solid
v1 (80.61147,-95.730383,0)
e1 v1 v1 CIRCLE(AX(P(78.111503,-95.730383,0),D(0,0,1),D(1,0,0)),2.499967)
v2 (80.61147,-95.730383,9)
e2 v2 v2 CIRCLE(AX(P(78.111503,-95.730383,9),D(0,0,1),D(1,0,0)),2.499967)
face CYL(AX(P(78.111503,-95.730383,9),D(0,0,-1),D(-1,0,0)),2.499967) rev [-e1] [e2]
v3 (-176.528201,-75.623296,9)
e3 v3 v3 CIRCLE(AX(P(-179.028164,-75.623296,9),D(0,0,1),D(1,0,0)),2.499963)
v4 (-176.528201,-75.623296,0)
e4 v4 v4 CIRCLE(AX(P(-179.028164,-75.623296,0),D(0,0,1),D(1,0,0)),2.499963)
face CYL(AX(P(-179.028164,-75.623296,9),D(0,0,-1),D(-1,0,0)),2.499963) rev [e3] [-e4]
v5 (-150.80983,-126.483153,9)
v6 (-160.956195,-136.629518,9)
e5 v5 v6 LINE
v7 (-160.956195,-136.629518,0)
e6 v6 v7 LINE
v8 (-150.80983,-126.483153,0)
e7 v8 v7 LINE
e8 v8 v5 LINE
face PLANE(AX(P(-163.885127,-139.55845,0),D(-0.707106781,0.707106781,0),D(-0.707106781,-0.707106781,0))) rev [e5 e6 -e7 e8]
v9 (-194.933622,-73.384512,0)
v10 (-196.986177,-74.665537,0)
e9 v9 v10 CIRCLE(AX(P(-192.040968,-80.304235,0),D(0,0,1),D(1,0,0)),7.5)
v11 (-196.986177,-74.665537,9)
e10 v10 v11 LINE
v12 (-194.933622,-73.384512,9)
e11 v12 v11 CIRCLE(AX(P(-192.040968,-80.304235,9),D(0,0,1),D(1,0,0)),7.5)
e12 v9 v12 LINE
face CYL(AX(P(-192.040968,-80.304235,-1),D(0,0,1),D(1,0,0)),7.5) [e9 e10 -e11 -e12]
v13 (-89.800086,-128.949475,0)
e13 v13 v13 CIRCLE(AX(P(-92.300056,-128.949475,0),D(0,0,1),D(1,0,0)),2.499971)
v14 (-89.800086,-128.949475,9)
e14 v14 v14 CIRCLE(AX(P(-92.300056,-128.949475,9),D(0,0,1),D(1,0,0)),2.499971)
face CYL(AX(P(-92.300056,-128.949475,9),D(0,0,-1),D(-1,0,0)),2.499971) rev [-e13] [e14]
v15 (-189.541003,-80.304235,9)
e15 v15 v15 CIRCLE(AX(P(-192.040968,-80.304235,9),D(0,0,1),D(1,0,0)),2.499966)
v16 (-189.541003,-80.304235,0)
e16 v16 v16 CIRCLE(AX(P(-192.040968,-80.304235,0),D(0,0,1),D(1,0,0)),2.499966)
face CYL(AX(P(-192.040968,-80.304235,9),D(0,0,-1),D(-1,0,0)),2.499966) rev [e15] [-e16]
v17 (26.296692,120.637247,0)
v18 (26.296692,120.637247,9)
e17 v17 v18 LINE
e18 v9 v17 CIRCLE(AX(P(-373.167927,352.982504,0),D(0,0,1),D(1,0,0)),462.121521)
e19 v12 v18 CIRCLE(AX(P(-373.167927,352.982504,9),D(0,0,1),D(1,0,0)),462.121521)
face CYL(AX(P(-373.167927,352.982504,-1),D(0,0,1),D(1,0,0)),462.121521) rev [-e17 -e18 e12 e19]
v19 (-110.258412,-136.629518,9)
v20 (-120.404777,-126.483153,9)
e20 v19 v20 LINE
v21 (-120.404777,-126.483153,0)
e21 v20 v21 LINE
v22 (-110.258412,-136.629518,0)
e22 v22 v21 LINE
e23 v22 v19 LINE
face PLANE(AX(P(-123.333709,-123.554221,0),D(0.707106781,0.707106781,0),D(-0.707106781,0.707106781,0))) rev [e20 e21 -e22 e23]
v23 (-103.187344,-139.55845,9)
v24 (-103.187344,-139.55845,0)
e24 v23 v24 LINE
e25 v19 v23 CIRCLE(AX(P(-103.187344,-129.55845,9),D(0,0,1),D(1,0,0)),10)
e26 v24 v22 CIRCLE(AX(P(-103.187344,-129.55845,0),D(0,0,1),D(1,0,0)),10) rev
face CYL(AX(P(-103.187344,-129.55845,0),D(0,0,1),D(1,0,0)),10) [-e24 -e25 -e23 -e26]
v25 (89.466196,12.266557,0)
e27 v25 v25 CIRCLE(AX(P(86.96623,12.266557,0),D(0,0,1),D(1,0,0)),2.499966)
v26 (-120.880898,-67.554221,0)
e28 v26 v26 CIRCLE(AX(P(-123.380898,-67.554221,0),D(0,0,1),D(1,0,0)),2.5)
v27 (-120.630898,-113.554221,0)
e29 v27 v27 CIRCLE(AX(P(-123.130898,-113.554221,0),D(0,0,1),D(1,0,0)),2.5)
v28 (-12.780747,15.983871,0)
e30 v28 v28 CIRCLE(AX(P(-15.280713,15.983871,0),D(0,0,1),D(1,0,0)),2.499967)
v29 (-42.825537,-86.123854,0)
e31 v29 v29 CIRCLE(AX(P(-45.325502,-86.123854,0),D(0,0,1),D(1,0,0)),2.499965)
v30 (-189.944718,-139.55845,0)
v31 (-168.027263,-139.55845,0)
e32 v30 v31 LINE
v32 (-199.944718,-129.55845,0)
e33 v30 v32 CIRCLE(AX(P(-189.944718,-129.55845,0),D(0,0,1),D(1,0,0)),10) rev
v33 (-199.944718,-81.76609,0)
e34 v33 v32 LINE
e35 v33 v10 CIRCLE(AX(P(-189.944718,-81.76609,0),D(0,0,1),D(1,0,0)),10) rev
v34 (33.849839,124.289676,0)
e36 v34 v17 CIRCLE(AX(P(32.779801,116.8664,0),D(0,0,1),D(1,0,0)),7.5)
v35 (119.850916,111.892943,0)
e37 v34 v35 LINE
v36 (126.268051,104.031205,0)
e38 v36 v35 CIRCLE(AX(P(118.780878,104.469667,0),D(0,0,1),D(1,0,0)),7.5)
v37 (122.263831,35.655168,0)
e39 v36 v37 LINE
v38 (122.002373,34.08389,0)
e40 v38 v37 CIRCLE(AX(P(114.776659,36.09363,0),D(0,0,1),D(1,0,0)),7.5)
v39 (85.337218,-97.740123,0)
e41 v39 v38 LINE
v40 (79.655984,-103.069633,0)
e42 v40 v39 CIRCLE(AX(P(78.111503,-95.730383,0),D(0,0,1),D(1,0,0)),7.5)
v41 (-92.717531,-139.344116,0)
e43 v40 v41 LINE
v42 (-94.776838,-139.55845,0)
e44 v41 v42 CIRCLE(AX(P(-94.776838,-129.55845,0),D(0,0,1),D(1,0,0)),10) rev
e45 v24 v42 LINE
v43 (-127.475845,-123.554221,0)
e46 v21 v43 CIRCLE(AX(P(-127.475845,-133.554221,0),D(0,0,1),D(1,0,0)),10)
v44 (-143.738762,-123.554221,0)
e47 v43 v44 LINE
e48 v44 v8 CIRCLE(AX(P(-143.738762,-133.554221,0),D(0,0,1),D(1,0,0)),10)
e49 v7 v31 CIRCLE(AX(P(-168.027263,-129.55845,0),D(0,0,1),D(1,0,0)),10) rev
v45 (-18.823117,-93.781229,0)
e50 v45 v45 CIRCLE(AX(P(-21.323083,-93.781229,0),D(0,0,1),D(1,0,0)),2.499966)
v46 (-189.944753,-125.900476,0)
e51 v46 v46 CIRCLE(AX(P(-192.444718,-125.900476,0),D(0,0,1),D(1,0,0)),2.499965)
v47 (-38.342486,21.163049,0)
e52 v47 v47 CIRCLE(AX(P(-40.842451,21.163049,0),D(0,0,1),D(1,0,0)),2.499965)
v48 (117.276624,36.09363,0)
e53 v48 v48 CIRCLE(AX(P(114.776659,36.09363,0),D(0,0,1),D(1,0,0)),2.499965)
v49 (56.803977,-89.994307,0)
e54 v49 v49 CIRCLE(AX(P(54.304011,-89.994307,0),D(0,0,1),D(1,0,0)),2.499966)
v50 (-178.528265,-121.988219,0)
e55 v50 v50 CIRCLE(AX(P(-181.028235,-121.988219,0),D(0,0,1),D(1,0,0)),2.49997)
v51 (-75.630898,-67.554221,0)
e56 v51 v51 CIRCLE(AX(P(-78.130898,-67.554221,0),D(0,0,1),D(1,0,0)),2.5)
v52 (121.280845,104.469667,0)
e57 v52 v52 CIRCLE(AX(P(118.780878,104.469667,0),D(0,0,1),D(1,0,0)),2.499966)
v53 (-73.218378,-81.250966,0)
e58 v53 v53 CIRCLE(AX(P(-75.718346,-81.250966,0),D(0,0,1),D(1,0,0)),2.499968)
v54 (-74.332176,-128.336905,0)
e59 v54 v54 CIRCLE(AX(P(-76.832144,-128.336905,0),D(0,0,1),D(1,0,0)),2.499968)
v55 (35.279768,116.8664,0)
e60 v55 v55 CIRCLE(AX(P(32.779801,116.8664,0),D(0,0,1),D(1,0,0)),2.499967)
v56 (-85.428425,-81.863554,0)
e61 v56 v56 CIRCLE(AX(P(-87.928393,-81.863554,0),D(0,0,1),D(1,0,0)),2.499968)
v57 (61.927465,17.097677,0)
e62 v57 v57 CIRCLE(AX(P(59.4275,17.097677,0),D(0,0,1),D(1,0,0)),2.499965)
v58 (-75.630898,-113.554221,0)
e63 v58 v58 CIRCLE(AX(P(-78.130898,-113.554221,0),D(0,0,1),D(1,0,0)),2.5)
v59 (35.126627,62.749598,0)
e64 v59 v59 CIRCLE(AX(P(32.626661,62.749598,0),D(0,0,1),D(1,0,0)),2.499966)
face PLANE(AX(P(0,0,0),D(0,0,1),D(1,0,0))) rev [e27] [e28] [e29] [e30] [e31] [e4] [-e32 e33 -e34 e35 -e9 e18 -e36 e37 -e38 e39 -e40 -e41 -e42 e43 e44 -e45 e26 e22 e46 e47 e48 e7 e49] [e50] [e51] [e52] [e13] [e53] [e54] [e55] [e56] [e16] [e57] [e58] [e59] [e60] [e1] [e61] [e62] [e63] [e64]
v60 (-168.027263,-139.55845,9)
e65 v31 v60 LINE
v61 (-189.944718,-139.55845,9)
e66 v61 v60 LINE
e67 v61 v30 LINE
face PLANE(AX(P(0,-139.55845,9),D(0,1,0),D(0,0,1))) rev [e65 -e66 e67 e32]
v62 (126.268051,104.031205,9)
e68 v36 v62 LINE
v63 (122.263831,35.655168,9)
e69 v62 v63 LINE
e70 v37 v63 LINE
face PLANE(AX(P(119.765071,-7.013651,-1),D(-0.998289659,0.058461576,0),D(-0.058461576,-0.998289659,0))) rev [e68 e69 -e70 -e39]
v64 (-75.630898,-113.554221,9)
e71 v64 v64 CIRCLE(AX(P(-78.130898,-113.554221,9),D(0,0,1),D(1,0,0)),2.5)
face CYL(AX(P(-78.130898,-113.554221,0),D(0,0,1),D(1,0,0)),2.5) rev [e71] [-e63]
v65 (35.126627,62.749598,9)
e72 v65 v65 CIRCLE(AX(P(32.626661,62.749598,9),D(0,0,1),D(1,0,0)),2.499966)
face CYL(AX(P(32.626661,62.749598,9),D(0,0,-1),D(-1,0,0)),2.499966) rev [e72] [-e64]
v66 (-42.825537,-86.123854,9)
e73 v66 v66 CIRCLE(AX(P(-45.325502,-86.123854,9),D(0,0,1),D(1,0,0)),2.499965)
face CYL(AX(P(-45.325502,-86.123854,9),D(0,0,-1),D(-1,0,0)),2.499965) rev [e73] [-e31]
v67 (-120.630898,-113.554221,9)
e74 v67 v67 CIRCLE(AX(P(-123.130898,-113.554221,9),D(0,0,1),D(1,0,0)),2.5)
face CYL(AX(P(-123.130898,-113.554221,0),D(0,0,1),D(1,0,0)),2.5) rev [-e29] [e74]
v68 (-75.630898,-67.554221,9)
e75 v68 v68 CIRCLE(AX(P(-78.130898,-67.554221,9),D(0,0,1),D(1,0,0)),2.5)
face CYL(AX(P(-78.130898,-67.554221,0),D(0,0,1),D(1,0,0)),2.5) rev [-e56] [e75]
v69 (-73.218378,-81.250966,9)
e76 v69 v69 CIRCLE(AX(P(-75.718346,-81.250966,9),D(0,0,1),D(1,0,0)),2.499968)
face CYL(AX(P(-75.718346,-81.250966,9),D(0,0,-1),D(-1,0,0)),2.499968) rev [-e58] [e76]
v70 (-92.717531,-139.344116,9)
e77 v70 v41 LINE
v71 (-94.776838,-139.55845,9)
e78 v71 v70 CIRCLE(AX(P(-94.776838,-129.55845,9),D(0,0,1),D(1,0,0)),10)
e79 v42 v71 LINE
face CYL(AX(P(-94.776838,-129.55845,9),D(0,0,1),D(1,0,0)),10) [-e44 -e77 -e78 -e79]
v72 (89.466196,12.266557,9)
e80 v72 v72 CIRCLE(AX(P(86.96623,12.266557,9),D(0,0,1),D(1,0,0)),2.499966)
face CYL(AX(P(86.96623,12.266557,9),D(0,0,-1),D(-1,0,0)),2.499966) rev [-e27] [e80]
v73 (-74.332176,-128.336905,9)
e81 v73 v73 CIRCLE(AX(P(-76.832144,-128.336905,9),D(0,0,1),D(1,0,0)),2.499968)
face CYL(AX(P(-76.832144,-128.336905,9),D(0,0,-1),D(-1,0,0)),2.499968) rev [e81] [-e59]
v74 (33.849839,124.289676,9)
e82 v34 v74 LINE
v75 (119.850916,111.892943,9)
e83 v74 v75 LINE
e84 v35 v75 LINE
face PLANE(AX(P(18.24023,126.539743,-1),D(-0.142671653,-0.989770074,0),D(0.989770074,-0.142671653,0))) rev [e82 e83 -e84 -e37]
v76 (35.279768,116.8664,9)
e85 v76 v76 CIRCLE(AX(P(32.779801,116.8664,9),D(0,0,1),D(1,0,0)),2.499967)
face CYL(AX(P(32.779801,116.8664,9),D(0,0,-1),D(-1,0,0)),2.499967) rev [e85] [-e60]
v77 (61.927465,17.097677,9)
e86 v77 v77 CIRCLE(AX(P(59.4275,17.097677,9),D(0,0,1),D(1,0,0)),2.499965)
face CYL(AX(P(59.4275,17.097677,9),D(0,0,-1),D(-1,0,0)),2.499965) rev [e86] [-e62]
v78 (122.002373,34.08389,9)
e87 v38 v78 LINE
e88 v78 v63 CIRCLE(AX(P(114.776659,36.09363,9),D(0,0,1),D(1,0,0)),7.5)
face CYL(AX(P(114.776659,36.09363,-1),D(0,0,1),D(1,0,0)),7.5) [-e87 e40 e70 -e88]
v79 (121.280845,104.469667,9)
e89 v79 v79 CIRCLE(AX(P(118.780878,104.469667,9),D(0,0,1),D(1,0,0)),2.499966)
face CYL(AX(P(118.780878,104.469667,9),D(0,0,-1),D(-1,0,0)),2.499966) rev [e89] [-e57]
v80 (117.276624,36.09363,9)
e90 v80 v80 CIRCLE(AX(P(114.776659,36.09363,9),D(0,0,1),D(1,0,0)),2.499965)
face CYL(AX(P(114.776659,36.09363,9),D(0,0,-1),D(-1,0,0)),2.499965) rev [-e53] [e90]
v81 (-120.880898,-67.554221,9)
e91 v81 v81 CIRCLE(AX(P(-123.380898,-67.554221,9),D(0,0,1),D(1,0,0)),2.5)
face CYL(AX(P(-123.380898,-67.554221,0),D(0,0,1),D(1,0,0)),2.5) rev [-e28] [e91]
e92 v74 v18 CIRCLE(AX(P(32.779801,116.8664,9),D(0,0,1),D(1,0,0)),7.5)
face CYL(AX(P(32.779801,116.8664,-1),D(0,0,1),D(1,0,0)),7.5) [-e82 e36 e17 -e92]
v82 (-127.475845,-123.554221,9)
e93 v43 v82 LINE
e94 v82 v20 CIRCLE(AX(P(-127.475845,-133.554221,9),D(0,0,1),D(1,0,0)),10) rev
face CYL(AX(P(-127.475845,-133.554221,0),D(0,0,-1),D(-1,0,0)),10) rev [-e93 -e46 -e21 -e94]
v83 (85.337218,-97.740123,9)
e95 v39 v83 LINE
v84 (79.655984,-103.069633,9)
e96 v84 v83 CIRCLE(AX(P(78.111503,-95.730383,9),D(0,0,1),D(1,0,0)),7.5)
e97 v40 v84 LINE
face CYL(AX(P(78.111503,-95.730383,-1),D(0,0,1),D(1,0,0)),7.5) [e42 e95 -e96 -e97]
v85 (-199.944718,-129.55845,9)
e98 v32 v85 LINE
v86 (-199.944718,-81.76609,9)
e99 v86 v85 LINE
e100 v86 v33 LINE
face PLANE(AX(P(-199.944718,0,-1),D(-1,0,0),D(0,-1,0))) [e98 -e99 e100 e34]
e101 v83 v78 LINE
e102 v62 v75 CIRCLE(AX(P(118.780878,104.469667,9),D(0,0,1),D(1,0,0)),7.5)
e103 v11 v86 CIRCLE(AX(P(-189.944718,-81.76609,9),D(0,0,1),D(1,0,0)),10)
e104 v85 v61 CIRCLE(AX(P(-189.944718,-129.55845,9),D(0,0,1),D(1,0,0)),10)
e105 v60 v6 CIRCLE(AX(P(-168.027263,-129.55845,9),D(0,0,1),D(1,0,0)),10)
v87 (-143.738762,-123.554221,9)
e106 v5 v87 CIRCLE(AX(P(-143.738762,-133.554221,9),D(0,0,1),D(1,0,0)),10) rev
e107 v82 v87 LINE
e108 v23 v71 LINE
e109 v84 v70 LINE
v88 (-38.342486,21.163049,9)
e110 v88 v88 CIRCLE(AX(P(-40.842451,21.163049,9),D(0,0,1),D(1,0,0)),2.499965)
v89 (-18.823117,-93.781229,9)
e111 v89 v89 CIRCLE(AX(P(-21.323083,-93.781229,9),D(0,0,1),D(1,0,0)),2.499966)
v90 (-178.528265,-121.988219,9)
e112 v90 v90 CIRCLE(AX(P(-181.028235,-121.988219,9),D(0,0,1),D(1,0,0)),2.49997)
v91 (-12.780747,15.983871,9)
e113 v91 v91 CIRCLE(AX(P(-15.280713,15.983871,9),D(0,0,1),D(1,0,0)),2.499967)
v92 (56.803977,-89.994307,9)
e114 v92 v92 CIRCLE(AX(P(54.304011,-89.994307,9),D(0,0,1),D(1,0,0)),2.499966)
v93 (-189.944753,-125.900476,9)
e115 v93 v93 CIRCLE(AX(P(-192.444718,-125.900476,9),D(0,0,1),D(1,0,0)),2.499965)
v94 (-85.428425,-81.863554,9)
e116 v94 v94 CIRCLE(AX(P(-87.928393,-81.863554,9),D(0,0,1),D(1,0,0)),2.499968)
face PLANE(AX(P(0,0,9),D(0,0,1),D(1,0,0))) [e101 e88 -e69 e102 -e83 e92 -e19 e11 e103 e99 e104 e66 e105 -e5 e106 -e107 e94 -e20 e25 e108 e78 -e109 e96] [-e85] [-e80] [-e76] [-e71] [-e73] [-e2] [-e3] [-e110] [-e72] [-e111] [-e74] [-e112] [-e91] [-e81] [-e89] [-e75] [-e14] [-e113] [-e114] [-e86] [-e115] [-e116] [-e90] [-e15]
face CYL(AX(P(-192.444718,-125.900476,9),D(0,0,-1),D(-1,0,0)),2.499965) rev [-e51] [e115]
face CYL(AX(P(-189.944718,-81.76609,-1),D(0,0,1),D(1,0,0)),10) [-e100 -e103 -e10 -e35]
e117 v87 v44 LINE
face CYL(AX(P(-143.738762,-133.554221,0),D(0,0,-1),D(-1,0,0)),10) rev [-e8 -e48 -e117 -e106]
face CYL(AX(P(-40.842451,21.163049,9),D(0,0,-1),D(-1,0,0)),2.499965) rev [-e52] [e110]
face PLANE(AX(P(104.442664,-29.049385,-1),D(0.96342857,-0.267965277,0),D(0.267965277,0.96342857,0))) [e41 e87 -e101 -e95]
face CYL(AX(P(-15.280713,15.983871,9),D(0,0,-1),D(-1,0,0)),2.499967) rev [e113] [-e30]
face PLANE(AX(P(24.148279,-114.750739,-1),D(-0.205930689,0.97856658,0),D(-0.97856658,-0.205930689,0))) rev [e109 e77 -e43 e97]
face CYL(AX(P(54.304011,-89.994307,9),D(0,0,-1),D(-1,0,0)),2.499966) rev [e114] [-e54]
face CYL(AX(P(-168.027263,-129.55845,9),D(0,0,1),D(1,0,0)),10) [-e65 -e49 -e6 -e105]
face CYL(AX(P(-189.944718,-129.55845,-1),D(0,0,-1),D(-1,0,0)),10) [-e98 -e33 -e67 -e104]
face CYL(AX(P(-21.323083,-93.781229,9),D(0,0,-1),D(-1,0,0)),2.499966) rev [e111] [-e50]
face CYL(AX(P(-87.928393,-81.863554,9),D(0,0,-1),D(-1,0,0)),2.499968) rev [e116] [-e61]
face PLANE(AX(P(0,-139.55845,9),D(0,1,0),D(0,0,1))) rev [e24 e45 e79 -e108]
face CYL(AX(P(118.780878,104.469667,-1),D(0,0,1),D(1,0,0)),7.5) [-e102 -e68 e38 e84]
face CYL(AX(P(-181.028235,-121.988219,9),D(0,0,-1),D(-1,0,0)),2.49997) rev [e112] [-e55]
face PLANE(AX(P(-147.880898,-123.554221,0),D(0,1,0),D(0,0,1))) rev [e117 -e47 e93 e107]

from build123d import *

# Parameters (mm, degrees)
SKETCH2_R           = 2.499965
SKETCH2_R_2         = 2.49997
SKETCH2_R_3         = 2.4999655
SKETCH2_R_4         = 2.499962807
SKETCH2_R_5         = 2.4999705
SKETCH2_R_6         = 2.499967809
SKETCH2_R_7         = 2.499966
SKETCH2_R_8         = 2.4999665
SKETCH2_R_9         = 2.499966488
BOSS_EXTRUDE1_DEPTH = 9
CUT_EXTRUDE1_DEPTH  = 10
CUT_EXTRUDE2_DEPTH  = 244.998875453
SKETCH5_R           = 2.5
CUT_EXTRUDE3_DEPTH  = 244.998875453
CUT_EXTRUDE5_DEPTH  = 10
FILLET1_R           = 10


with BuildPart() as part:
    # Sketch2 → Boss-Extrude1 (new body)
    with BuildSketch(Plane.XY):
        Polygon((-211.70586, -139.55845), (122.983766, -139.55845), (211.70583, 139.558464), (-211.70586, 139.558464), align=None)
        with Locations((-192.444718, -125.900476)):
            Circle(SKETCH2_R, mode=Mode.SUBTRACT)
        with Locations((-181.028235, -121.988219)):
            Circle(SKETCH2_R_2, mode=Mode.SUBTRACT)
        with Locations((-192.0409685, -80.3042345)):
            Circle(SKETCH2_R_3, mode=Mode.SUBTRACT)
        with Locations((-179.0281635, -75.623296193)):
            Circle(SKETCH2_R_4, mode=Mode.SUBTRACT)
        with Locations((-92.3000565, -128.9494755)):
            Circle(SKETCH2_R_5, mode=Mode.SUBTRACT)
        with Locations((-76.832143809, -128.336904809)):
            Circle(SKETCH2_R_6, mode=Mode.SUBTRACT)
        with Locations((-87.928392809, -81.863553809)):
            Circle(SKETCH2_R_6, mode=Mode.SUBTRACT)
        with Locations((-75.718345809, -81.250965809)):
            Circle(SKETCH2_R_6, mode=Mode.SUBTRACT)
        with Locations((-45.325502, -86.123854)):
            Circle(SKETCH2_R, mode=Mode.SUBTRACT)
        with Locations((-21.323083, -93.781229)):
            Circle(SKETCH2_R_7, mode=Mode.SUBTRACT)
        with Locations((54.304011, -89.994307)):
            Circle(SKETCH2_R_7, mode=Mode.SUBTRACT)
        with Locations((78.1115035, -95.7303835)):
            Circle(SKETCH2_R_8, mode=Mode.SUBTRACT)
        with Locations((114.776659, 36.09363)):
            Circle(SKETCH2_R, mode=Mode.SUBTRACT)
        with Locations((86.96623, 12.266557)):
            Circle(SKETCH2_R_7, mode=Mode.SUBTRACT)
        with Locations((59.4275, 17.097677)):
            Circle(SKETCH2_R, mode=Mode.SUBTRACT)
        with Locations((-40.842451, 21.163049)):
            Circle(SKETCH2_R, mode=Mode.SUBTRACT)
        with Locations((-15.2807135, 15.9838705)):
            Circle(SKETCH2_R_8, mode=Mode.SUBTRACT)
        with Locations((32.626661, 62.749598)):
            Circle(SKETCH2_R_7, mode=Mode.SUBTRACT)
        with Locations((118.780878488, 104.469667)):
            Circle(SKETCH2_R_9, mode=Mode.SUBTRACT)
        with Locations((32.7798015, 116.8664005)):
            Circle(SKETCH2_R_8, mode=Mode.SUBTRACT)
    extrude(amount=BOSS_EXTRUDE1_DEPTH)

    # Sketch3 → Cut-Extrude1 (cut)
    with BuildSketch(Plane.XY.offset(9)):
        Polygon((147.113293383, 124.3664005), (73.705987484, -139.55845), (211.70583, -139.55845), (211.70583, 139.558464), (-211.70586, 139.558464), (-211.70586, -139.55845), (-199.944718, -139.55845), (-199.944718, -77.260214262), (29.956914073, 124.3664005), align=None)
    extrude(amount=-CUT_EXTRUDE1_DEPTH, mode=Mode.SUBTRACT)

    # Sketch4 → Cut-Extrude2 (cut, through all)
    with BuildSketch(Plane.XY.offset(9)):
        Polygon((-163.885127, -139.55845), (-147.880898, -123.554221), (-123.333708966, -123.554221), (-107.329479966, -139.55845), align=None)
    extrude(amount=-CUT_EXTRUDE2_DEPTH, mode=Mode.SUBTRACT)

    # Sketch5 → Cut-Extrude3 (cut, through all)
    with BuildSketch(Plane.XY.offset(9)):
        with Locations((-123.130898, -113.554221)):
            Circle(SKETCH5_R)
        with Locations((-78.130898, -113.554221)):
            Circle(SKETCH5_R)
        with Locations((-123.380898, -67.554221)):
            Circle(SKETCH5_R)
        with Locations((-78.130898, -67.554221)):
            Circle(SKETCH5_R)
    extrude(amount=-CUT_EXTRUDE3_DEPTH, mode=Mode.SUBTRACT)

    # Sketch6 → Cut-Extrude5 (cut)
    with BuildSketch(Plane.XY.offset(9)):
        with BuildLine():
            Line((-195.525508542, -73.384512142), (-194.933621691, -73.384512142))
            ThreePointArc((-194.933621691, -73.384512142), (-115.656074248, -30.741284252), (-46.149790694, 26.462307945))
            ThreePointArc((-46.149790694, 26.462307945), (-6.887258575, 71.211725192), (26.296691523, 120.637247226))
            Line((26.296691523, 120.637247226), (26.296691523, 121.156339417))
            Line((26.296691523, 121.156339417), (-195.525508542, -73.384512142))
        make_face()
        Polygon((147.113293383, 35.655168177), (147.113293383, 124.3664005), (122.439403996, 35.655168177), align=None)
        Polygon((-75.287663516, -135.676154132), (-93.736030822, -139.55845), (73.705987484, -139.55845), (83.854883116, -103.069632849), (79.655983667, -103.069632849), align=None)
        with BuildLine():
            Line((79.655983667, -103.069632849), (83.854883116, -103.069632849))
            Line((83.854883116, -103.069632849), (85.337218021, -97.740122205))
            ThreePointArc((85.337218021, -97.740122205), (83.24278011, -101.200301265), (79.655983667, -103.069632849))
        make_face()
        with BuildLine():
            ThreePointArc((-196.986177186, -74.665536862), (-196.011897332, -73.941709513), (-194.933621691, -73.384512142))
            Line((-194.933621691, -73.384512142), (-195.525508542, -73.384512142))
            Line((-195.525508542, -73.384512142), (-196.986177186, -74.665536862))
        make_face()
        Polygon((26.296691523, 124.3664005), (26.296691523, 121.156339417), (27.834592626, 122.505097973), (29.956914073, 124.3664005), align=None)
        with BuildLine():
            Line((27.834592626, 122.505097973), (26.296691523, 121.156339417))
            Line((26.296691523, 121.156339417), (26.296691523, 120.637247226))
            ThreePointArc((26.296691523, 120.637247226), (26.989824424, 121.633597313), (27.834592626, 122.505097973))
        make_face()
        with BuildLine():
            Line((29.956914073, 124.3664005), (27.834592626, 122.505097973))
            ThreePointArc((27.834592626, 122.505097973), (30.137854408, 123.885667952), (32.779801516, 124.3664005))
            Line((32.779801516, 124.3664005), (29.956914073, 124.3664005))
        make_face()
        with BuildLine():
            Line((147.113293383, 124.3664005), (32.779801516, 124.3664005))
            ThreePointArc((32.779801516, 124.3664005), (33.31619378, 124.347194798), (33.849838899, 124.289676055))
            Line((33.849838899, 124.289676055), (119.850915887, 111.892942555))
            ThreePointArc((119.850915887, 111.892942555), (124.449885477, 109.380100764), (126.280878488, 104.469667))
            ThreePointArc((126.280878488, 104.469667), (126.277670913, 104.250342289), (126.268050933, 104.031205177))
            Line((126.268050933, 104.031205177), (122.263831446, 35.655168177))
            Line((122.263831446, 35.655168177), (122.439403996, 35.655168177))
            Line((122.439403996, 35.655168177), (147.113293383, 124.3664005))
        make_face()
        with BuildLine():
            Line((122.002373456, 34.083891063), (122.439403996, 35.655168177))
            Line((122.439403996, 35.655168177), (122.263831446, 35.655168177))
            ThreePointArc((122.263831446, 35.655168177), (122.174935028, 34.862568747), (122.002373456, 34.083891063))
        make_face()
    extrude(amount=-CUT_EXTRUDE5_DEPTH, mode=Mode.SUBTRACT)

    # Fillet1
    # the kernel refuses this fillet: 10 mm, written as the material it adds along each edge
    with BuildSketch(Plane(origin=(-147.880898, -123.554221, 9), x_dir=(1, 0, 0), z_dir=(0, 0, -1)), Plane(origin=(-123.333708966, -123.554221, 9), x_dir=(0.707106781186551, -0.7071067811865441, 0), z_dir=(0, 0, -1))) as fillet1_piece_1:
        with BuildLine():
            CenterArc((FILLET1_R * 0.414213562373, FILLET1_R), FILLET1_R, 225, 45)
            Line((-FILLET1_R * 0.292893218813, FILLET1_R * 0.292893218813), (0, 0))
            Line((0, 0), (FILLET1_R * 0.414213562373, 0))
        make_face()
    extrude(amount=9)
    # the kernel refuses this fillet: 10 mm, written as the material it takes off along each edge
    with BuildSketch(Plane(origin=(-199.944718, -77.260214262, 20.264688934), x_dir=(0, -1, 0), z_dir=(0, 0, -1))) as fillet1_2_piece_1:
        with BuildLine():
            CenterArc((4.505875574, -10), FILLET1_R, 90, 45.239414653)
            Line((-2.5946774, -2.958540814), (0, 0))
            Line((0, 0), (4.505875574, 0))
        make_face()
    extrude(amount=31.529377868, mode=Mode.SUBTRACT)
    with BuildSketch(Plane(origin=(-163.885127, -139.55845, 19.355339059), x_dir=(-1, 0, 0), z_dir=(0, 0, -1)), Plane(origin=(-107.329479966, -139.55845, 19.355339059), x_dir=(-0.707106781186551, 0.7071067811865441, 0), z_dir=(0, 0, -1))) as fillet1_2_piece_2:
        with BuildLine():
            CenterArc((FILLET1_R * 0.414213562373, FILLET1_R), FILLET1_R, 225, 45)
            Line((-FILLET1_R * 0.292893218813, FILLET1_R * 0.292893218813), (0, 0))
            Line((0, 0), (FILLET1_R * 0.414213562373, 0))
        make_face()
    extrude(amount=29.710678119, mode=Mode.SUBTRACT)
    with BuildSketch(Plane(origin=(-93.736030822, -139.55845, 11.602018692), x_dir=(-1, 0, 0), z_dir=(0, 0, -1))) as fillet1_2_piece_3:
        with BuildLine():
            CenterArc((FILLET1_R * 0.104080747675, FILLET1_R), FILLET1_R, 258.116013885, 11.883986115)
            Line((-FILLET1_R * 0.101849941288, FILLET1_R * 0.0214334200765), (0, 0))
            Line((0, 0), (FILLET1_R * 0.104080747675, 0))
        make_face()
    extrude(amount=14.204037384, mode=Mode.SUBTRACT)
    with BuildSketch(Plane(origin=(-199.944718, -139.55845, 34), x_dir=(1, 0, 0), z_dir=(0, 0, -1))) as fillet1_2_piece_4:
        with BuildLine():
            CenterArc((FILLET1_R, -FILLET1_R), FILLET1_R, 90, 90)
            Line((0, -FILLET1_R), (0, 0))
            Line((0, 0), (FILLET1_R, 0))
        make_face()
    extrude(amount=59, mode=Mode.SUBTRACT)


solid = part.part
